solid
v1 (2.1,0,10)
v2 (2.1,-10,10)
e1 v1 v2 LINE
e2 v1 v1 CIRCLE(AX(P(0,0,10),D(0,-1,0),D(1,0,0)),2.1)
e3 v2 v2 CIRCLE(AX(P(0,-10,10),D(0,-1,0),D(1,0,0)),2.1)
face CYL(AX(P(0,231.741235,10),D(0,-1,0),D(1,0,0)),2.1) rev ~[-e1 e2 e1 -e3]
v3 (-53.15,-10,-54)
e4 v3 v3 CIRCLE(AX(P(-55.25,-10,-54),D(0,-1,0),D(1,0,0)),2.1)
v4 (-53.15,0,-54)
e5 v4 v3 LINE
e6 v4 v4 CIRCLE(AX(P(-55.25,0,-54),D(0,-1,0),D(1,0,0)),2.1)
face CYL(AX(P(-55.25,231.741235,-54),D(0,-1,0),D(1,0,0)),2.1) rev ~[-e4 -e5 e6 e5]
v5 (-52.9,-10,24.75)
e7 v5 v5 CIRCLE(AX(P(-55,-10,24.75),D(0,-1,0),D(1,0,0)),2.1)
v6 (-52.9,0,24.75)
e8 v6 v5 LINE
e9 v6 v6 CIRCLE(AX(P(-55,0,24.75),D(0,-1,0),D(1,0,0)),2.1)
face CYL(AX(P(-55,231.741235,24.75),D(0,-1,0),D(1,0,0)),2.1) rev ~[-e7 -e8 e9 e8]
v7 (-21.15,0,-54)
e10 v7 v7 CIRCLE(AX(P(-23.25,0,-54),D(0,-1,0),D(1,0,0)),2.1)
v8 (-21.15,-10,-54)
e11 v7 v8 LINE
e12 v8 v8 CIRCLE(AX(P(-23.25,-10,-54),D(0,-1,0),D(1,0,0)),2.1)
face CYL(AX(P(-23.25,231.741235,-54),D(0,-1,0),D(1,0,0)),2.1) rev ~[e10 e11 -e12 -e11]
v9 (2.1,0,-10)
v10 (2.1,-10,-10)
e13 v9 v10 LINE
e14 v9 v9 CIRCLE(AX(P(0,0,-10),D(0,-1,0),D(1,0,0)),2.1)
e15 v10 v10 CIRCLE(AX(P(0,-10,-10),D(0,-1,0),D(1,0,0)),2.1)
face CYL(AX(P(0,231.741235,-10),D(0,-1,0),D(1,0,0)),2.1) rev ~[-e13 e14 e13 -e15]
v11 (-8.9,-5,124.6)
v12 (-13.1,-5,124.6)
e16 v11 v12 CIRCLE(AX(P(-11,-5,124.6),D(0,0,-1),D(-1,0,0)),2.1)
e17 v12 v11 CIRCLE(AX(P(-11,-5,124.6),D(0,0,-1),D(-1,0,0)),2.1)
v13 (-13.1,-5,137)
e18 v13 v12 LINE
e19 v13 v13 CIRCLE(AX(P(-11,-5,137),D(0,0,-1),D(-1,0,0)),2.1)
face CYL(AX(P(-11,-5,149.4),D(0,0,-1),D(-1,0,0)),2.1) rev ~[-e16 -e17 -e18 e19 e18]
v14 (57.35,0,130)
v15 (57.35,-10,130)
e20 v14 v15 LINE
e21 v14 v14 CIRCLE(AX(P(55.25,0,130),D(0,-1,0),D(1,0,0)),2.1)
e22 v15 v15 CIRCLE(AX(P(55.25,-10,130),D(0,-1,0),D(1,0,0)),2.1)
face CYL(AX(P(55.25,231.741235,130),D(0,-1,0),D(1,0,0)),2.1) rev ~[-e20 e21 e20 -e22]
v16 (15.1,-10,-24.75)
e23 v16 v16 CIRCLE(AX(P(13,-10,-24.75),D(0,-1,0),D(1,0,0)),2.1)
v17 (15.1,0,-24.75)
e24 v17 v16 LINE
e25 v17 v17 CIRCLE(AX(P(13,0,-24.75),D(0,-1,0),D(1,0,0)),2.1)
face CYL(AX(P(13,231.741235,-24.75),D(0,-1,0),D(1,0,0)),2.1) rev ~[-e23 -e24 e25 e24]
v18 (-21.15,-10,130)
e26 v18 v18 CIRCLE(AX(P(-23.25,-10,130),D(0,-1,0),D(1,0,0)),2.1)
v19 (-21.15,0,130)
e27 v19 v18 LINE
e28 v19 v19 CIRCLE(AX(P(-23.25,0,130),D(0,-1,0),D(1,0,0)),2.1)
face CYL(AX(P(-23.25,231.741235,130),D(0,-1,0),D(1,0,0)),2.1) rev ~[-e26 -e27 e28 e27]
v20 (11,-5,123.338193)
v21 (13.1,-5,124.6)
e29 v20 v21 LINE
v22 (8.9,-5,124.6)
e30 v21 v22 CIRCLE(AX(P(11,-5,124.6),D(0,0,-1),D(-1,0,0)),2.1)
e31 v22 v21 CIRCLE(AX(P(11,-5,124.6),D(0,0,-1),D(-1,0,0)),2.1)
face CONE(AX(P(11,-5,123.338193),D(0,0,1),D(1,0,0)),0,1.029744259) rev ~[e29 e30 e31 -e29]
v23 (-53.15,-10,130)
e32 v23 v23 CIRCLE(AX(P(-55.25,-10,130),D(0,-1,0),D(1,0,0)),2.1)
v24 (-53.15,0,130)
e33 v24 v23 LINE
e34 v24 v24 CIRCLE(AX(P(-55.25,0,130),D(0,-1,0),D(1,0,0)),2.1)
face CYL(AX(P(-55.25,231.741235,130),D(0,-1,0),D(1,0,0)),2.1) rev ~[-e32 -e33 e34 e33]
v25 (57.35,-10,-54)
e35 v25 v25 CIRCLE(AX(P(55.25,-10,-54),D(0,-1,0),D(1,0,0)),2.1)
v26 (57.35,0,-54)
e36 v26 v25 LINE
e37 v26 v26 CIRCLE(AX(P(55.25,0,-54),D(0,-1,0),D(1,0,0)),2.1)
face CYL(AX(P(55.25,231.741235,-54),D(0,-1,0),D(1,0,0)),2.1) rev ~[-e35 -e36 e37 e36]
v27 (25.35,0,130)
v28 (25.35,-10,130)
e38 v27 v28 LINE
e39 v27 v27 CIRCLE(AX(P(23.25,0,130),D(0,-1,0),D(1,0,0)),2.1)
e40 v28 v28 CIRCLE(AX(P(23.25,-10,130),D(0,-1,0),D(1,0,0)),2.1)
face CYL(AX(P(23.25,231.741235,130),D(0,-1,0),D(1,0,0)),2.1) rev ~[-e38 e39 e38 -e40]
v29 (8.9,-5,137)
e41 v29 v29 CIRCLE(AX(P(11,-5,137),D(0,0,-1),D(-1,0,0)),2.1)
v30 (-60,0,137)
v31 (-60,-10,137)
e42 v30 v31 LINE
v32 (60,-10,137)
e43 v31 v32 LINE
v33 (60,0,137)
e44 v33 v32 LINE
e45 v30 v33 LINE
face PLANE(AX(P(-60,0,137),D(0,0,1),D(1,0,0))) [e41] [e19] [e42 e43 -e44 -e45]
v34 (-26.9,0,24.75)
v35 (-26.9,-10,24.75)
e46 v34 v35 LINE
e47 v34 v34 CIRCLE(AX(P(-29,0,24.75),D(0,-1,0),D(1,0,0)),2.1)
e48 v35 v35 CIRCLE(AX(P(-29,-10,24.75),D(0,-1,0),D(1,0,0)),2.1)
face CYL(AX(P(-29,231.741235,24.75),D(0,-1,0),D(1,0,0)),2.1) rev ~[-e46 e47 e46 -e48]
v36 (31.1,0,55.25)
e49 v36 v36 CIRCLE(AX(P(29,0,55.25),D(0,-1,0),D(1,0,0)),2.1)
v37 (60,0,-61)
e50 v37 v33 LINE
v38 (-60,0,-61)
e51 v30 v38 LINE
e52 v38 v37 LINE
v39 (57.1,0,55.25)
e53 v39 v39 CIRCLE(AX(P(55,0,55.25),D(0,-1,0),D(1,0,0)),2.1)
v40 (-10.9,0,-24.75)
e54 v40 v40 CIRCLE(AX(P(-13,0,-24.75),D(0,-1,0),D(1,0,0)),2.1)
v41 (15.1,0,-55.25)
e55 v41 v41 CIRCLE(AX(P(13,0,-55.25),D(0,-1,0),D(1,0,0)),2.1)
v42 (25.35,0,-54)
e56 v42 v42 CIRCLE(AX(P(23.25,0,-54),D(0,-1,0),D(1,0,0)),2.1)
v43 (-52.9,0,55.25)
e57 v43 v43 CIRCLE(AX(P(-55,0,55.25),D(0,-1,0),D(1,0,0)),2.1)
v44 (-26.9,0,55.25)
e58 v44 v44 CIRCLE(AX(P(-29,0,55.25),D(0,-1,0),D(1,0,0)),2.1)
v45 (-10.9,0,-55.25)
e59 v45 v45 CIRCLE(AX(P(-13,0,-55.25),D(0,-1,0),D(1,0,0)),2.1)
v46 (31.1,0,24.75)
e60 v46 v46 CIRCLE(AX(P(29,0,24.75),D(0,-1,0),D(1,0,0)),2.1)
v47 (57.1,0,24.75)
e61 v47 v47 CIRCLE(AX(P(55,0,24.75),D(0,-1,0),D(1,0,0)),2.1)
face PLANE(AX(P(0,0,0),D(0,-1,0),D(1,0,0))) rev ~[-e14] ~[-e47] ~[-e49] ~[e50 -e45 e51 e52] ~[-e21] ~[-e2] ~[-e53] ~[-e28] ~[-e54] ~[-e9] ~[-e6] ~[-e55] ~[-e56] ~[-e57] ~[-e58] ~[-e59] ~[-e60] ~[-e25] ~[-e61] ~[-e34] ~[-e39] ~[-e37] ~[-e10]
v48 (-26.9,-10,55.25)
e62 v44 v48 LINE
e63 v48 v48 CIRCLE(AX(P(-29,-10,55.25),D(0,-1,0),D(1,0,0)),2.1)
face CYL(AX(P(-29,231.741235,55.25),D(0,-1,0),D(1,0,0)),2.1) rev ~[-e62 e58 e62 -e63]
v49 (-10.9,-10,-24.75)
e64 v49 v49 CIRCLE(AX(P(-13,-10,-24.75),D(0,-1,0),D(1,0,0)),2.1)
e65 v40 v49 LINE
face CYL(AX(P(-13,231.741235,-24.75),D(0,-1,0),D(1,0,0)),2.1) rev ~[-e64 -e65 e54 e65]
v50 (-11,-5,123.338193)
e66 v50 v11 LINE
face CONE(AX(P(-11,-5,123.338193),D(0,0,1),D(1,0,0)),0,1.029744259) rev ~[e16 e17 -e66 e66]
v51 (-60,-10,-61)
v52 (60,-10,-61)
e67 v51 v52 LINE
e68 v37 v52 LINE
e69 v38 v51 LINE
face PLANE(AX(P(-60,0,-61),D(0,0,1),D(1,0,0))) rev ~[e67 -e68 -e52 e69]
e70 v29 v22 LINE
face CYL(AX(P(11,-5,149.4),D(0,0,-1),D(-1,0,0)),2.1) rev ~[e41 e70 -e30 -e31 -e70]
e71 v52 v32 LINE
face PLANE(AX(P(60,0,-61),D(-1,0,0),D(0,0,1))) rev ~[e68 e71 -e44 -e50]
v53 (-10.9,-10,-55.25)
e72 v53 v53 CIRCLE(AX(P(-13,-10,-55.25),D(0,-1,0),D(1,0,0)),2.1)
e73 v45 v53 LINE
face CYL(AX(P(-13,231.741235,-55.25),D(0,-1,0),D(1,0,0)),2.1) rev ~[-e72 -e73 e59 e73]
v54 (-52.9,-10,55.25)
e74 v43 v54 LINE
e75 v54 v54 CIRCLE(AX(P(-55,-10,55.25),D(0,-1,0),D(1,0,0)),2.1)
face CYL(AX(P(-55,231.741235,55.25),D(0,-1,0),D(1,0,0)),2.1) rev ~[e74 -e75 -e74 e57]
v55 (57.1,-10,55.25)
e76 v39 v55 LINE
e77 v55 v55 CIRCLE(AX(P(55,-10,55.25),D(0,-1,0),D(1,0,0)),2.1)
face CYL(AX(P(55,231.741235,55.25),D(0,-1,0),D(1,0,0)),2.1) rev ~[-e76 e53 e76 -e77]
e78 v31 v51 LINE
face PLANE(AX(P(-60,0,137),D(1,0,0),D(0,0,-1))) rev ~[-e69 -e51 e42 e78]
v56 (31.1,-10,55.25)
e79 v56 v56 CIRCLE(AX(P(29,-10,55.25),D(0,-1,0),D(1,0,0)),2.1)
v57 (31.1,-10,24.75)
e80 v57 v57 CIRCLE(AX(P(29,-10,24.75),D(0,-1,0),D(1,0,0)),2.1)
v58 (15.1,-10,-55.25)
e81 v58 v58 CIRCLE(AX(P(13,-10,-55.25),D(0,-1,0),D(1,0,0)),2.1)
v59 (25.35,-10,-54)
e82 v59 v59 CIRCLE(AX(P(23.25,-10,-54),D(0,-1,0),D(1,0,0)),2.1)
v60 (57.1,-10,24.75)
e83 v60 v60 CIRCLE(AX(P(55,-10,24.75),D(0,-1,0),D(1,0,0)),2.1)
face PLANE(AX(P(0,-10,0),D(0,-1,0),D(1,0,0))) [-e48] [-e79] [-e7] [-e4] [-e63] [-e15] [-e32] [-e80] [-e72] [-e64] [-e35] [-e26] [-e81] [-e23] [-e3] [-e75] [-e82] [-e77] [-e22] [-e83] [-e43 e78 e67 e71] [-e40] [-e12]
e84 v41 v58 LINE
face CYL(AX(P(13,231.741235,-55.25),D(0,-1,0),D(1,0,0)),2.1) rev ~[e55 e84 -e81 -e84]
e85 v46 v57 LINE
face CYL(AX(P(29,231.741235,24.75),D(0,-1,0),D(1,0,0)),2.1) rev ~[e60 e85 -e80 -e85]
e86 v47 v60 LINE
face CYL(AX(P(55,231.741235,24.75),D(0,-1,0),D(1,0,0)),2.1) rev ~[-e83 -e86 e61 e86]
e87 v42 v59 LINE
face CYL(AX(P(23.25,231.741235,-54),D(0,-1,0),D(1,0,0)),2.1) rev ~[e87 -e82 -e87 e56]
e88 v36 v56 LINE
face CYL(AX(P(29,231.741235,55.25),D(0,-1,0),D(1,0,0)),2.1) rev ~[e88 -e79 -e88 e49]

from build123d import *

# Parameters (mm, degrees)
F0_W     = 120
F0_H     = 122
F0_H_2   = 76
F1_DEPTH = 10
F3_D     = 4.2
F5_D     = 4.2
F7_D     = 4.2
F7_DEPTH = 12.4
F7_TIP   = 1.2618073


# Not quite as in the source:
# - a feature names something its author has since deleted; it is built from what else it names


with BuildPart() as f1:
    # F0 (on Front) → F1 (new body)
    with BuildSketch(Plane.XZ):
        Rectangle(F0_W, F0_H)
        with Locations((0, 99)):
            Rectangle(F0_W, F0_H_2)
    extrude(amount=F1_DEPTH)

    # F3 (through all)
    with Locations(Plane(origin=(0, 0, 0), x_dir=(-1, 0, 0), z_dir=(0, 1, 0))):
        with Locations((-55, 55.25), (-29, 55.25), (-29, 24.75), (-55, 24.75), (29, 55.25), (55, 55.25), (55, 24.75), (29, 24.75), (-13, -24.75), (13, -24.75), (13, -55.25), (-13, -55.25), (0, 10), (0, -10)):
            Hole(F3_D / 2)

    # F5 (through all)
    with Locations(Plane(origin=(0, 0, 0), x_dir=(-1, 0, 0), z_dir=(0, 1, 0))):
        with Locations((-55.25, 130), (-23.25, 130), (23.25, 130), (55.25, 130), (-55.25, -54), (-23.25, -54), (23.25, -54), (55.25, -54)):
            Hole(F5_D / 2)

    # F7
    with Locations(Plane.XY.offset(137)):
        with Locations((11, -5), (-11, -5)):
            Hole(F7_D / 2, depth=F7_DEPTH)
            with Locations((0, 0, -(F7_DEPTH + F7_TIP / 2))):  # 118° drill point
                Cone(0, F7_D / 2, F7_TIP, mode=Mode.SUBTRACT)


solid = f1.part
